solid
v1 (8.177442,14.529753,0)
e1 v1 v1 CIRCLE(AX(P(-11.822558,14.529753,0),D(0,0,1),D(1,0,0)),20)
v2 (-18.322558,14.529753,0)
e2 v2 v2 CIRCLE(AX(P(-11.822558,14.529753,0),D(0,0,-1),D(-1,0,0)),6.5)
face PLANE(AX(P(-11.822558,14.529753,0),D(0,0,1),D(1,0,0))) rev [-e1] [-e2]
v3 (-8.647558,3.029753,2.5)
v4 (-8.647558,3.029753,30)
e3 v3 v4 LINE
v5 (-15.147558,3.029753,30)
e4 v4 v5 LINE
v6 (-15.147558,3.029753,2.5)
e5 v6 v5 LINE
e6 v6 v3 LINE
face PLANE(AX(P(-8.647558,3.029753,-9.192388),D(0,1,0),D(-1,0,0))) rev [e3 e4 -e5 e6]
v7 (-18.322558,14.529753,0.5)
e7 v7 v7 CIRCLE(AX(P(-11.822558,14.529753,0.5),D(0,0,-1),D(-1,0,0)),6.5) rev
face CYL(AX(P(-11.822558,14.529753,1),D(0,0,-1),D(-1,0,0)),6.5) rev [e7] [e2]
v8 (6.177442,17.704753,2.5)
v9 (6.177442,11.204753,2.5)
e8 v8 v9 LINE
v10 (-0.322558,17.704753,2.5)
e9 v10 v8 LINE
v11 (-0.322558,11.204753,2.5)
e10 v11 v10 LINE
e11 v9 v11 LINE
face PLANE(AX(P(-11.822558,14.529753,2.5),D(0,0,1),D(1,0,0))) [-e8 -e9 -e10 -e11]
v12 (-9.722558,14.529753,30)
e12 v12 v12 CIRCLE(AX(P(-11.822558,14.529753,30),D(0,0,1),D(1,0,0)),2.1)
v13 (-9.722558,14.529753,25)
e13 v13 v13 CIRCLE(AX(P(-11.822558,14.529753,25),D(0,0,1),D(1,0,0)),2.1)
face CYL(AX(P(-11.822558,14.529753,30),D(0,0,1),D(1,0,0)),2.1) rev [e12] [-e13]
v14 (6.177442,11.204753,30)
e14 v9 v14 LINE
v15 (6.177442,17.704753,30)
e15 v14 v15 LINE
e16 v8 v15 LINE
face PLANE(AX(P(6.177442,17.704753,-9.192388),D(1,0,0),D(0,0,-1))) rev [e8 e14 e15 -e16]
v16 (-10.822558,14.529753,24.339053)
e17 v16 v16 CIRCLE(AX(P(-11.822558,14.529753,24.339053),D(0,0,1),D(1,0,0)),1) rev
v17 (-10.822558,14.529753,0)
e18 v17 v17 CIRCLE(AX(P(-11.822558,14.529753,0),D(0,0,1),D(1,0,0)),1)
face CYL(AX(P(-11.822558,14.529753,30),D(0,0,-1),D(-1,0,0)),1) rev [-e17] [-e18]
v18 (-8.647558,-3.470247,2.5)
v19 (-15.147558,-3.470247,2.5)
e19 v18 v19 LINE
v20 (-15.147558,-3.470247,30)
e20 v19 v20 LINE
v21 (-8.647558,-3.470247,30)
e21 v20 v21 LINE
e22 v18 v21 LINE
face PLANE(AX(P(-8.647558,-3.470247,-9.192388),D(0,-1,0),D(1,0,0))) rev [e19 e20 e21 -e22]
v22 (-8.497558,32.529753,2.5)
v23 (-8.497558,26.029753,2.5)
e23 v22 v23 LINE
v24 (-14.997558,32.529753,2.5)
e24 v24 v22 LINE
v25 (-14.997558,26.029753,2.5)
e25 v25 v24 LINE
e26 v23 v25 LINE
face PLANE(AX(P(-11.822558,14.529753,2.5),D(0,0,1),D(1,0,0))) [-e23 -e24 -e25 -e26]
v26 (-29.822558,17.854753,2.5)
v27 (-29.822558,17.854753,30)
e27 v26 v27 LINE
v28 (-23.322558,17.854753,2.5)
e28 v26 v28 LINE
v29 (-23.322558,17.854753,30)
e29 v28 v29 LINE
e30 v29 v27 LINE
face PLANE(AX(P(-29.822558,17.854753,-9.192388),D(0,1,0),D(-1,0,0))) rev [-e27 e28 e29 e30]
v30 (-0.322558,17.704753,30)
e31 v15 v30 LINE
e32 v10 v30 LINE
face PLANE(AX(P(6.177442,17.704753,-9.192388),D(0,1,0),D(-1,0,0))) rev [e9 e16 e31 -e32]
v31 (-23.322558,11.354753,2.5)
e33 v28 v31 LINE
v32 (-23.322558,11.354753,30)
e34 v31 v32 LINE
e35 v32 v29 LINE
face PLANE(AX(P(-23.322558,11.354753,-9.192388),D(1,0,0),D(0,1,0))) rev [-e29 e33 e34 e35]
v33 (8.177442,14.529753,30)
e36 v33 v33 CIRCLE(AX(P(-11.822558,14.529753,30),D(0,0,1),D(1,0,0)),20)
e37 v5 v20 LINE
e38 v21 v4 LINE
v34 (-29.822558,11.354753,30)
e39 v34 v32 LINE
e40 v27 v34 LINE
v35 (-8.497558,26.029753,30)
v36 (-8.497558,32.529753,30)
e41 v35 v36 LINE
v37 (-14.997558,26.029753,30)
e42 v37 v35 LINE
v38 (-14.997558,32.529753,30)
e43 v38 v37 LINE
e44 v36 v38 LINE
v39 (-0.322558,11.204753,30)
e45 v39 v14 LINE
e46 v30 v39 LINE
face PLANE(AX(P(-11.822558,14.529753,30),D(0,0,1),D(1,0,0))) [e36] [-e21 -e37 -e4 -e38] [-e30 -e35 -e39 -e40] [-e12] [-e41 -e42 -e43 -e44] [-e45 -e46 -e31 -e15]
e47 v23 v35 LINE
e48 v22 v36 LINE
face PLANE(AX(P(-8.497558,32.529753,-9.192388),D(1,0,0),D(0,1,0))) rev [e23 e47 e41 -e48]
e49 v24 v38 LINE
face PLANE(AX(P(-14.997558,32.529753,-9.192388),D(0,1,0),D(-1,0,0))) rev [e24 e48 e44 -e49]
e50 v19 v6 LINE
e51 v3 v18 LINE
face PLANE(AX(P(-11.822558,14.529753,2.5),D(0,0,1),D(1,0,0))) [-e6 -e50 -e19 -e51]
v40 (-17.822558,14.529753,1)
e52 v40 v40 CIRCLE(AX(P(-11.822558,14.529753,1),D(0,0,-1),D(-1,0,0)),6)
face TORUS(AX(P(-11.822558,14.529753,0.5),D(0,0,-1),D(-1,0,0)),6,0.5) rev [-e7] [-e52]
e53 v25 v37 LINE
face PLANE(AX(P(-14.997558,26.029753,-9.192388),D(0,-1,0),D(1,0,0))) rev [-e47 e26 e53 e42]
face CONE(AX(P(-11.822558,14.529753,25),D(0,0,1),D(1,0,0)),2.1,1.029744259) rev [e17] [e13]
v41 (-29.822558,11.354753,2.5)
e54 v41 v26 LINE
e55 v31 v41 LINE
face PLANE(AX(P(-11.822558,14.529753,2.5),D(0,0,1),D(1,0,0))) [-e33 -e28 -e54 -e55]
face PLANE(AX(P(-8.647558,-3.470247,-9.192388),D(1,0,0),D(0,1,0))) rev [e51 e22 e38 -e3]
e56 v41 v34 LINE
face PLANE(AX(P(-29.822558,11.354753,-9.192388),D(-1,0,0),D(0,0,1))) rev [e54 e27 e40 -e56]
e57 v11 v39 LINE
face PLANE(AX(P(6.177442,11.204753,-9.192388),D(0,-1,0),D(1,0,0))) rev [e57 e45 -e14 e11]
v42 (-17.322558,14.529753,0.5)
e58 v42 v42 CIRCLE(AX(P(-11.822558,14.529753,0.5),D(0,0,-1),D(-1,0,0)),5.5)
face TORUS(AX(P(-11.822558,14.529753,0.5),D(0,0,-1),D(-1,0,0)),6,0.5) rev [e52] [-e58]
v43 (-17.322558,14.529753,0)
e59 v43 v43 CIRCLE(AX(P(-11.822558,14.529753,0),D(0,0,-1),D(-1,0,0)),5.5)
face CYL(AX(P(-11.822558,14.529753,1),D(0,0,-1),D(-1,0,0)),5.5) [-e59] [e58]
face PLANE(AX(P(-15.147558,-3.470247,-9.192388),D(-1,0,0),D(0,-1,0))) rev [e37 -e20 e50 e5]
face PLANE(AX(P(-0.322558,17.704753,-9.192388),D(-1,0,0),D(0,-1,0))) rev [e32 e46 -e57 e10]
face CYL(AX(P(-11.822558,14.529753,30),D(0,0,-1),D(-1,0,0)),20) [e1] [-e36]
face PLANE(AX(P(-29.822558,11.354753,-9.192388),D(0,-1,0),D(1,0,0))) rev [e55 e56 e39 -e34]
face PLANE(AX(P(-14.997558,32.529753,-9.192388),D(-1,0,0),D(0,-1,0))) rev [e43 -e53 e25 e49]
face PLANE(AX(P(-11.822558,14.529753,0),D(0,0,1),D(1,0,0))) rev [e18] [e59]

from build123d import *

# Parameters (mm, degrees)
SKETCH1_R                       = 20
SKETCH1_R_2                     = 1
BOSS_EXTRUDE1_DEPTH             = 30
TAP_DRILL_FOR_M5X0_8_TAP1_D     = 4.2
TAP_DRILL_FOR_M5X0_8_TAP1_DEPTH = 5
TAP_DRILL_FOR_M5X0_8_TAP1_TIP   = 1.2618073
SKETCH4_W                       = 6.5
SKETCH4_H                       = 6.5
CUT_EXTRUDE1_DEPTH              = 27.5
CIRPATTERN1_COUNT               = 4
SKETCH5_R                       = 6.5
SKETCH5_R_2                     = 5.5
CUT_EXTRUDE2_DEPTH              = 1
FILLET3_R                       = 0.5


with BuildPart() as part:
    # Sketch1 → Boss-Extrude1 (new body)
    with BuildSketch(Plane.XY):
        with Locations((-11.822558412, 14.529752947)):
            Circle(SKETCH1_R)
        with Locations((-11.822558412, 14.529752947)):
            Circle(SKETCH1_R_2, mode=Mode.SUBTRACT)
    extrude(amount=BOSS_EXTRUDE1_DEPTH)

    # Tap Drill for M5x0.8 Tap1
    with Locations(Plane.XY.offset(30)):
        with Locations((-11.822558412, 14.529752947)):
            Hole(TAP_DRILL_FOR_M5X0_8_TAP1_D / 2, depth=TAP_DRILL_FOR_M5X0_8_TAP1_DEPTH)
            with Locations((0, 0, -(TAP_DRILL_FOR_M5X0_8_TAP1_DEPTH + TAP_DRILL_FOR_M5X0_8_TAP1_TIP / 2))):  # 118° drill point
                Cone(0, TAP_DRILL_FOR_M5X0_8_TAP1_D / 2, TAP_DRILL_FOR_M5X0_8_TAP1_TIP, mode=Mode.SUBTRACT)

    # Sketch4 → Cut-Extrude1 (cut)
    with BuildSketch(Plane.XY.offset(30)):
        with Locations((2.927441588, 14.454752947)):
            Rectangle(SKETCH4_W, SKETCH4_H)
    cut_extrude1 = extrude(amount=-CUT_EXTRUDE1_DEPTH, mode=Mode.SUBTRACT)

    # CirPattern1: Cut-Extrude1 ×4 about axis
    cirpattern1_axis = Axis((-11.822558412, 14.529752947, 0), (0, 0, 1))
    for i in range(1, CIRPATTERN1_COUNT):
        add(cut_extrude1.rotate(cirpattern1_axis, i * 360 / CIRPATTERN1_COUNT), mode=Mode.SUBTRACT)

    # Sketch5 → Cut-Extrude2 (cut)
    with BuildSketch(Plane(origin=(0, 0, 0), x_dir=(-1, 0, 0), z_dir=(0, 0, -1))):
        with Locations((11.822558412, 14.529752947)):
            Circle(SKETCH5_R)
        with Locations((11.822558412, 14.529752947)):
            Circle(SKETCH5_R_2, mode=Mode.SUBTRACT)
    extrude(amount=-CUT_EXTRUDE2_DEPTH, mode=Mode.SUBTRACT)

    # Fillet3
    fillet3_edges = [part.edges().sort_by_distance(p)[0] for p in [
        (-5.322558412, 14.529752947, 1),
        (-6.322558412, 14.529752947, 1),
    ]]
    fillet(fillet3_edges, radius=FILLET3_R - 0.0001)  # a hair under: the kernel refuses the full size


solid = part.part
